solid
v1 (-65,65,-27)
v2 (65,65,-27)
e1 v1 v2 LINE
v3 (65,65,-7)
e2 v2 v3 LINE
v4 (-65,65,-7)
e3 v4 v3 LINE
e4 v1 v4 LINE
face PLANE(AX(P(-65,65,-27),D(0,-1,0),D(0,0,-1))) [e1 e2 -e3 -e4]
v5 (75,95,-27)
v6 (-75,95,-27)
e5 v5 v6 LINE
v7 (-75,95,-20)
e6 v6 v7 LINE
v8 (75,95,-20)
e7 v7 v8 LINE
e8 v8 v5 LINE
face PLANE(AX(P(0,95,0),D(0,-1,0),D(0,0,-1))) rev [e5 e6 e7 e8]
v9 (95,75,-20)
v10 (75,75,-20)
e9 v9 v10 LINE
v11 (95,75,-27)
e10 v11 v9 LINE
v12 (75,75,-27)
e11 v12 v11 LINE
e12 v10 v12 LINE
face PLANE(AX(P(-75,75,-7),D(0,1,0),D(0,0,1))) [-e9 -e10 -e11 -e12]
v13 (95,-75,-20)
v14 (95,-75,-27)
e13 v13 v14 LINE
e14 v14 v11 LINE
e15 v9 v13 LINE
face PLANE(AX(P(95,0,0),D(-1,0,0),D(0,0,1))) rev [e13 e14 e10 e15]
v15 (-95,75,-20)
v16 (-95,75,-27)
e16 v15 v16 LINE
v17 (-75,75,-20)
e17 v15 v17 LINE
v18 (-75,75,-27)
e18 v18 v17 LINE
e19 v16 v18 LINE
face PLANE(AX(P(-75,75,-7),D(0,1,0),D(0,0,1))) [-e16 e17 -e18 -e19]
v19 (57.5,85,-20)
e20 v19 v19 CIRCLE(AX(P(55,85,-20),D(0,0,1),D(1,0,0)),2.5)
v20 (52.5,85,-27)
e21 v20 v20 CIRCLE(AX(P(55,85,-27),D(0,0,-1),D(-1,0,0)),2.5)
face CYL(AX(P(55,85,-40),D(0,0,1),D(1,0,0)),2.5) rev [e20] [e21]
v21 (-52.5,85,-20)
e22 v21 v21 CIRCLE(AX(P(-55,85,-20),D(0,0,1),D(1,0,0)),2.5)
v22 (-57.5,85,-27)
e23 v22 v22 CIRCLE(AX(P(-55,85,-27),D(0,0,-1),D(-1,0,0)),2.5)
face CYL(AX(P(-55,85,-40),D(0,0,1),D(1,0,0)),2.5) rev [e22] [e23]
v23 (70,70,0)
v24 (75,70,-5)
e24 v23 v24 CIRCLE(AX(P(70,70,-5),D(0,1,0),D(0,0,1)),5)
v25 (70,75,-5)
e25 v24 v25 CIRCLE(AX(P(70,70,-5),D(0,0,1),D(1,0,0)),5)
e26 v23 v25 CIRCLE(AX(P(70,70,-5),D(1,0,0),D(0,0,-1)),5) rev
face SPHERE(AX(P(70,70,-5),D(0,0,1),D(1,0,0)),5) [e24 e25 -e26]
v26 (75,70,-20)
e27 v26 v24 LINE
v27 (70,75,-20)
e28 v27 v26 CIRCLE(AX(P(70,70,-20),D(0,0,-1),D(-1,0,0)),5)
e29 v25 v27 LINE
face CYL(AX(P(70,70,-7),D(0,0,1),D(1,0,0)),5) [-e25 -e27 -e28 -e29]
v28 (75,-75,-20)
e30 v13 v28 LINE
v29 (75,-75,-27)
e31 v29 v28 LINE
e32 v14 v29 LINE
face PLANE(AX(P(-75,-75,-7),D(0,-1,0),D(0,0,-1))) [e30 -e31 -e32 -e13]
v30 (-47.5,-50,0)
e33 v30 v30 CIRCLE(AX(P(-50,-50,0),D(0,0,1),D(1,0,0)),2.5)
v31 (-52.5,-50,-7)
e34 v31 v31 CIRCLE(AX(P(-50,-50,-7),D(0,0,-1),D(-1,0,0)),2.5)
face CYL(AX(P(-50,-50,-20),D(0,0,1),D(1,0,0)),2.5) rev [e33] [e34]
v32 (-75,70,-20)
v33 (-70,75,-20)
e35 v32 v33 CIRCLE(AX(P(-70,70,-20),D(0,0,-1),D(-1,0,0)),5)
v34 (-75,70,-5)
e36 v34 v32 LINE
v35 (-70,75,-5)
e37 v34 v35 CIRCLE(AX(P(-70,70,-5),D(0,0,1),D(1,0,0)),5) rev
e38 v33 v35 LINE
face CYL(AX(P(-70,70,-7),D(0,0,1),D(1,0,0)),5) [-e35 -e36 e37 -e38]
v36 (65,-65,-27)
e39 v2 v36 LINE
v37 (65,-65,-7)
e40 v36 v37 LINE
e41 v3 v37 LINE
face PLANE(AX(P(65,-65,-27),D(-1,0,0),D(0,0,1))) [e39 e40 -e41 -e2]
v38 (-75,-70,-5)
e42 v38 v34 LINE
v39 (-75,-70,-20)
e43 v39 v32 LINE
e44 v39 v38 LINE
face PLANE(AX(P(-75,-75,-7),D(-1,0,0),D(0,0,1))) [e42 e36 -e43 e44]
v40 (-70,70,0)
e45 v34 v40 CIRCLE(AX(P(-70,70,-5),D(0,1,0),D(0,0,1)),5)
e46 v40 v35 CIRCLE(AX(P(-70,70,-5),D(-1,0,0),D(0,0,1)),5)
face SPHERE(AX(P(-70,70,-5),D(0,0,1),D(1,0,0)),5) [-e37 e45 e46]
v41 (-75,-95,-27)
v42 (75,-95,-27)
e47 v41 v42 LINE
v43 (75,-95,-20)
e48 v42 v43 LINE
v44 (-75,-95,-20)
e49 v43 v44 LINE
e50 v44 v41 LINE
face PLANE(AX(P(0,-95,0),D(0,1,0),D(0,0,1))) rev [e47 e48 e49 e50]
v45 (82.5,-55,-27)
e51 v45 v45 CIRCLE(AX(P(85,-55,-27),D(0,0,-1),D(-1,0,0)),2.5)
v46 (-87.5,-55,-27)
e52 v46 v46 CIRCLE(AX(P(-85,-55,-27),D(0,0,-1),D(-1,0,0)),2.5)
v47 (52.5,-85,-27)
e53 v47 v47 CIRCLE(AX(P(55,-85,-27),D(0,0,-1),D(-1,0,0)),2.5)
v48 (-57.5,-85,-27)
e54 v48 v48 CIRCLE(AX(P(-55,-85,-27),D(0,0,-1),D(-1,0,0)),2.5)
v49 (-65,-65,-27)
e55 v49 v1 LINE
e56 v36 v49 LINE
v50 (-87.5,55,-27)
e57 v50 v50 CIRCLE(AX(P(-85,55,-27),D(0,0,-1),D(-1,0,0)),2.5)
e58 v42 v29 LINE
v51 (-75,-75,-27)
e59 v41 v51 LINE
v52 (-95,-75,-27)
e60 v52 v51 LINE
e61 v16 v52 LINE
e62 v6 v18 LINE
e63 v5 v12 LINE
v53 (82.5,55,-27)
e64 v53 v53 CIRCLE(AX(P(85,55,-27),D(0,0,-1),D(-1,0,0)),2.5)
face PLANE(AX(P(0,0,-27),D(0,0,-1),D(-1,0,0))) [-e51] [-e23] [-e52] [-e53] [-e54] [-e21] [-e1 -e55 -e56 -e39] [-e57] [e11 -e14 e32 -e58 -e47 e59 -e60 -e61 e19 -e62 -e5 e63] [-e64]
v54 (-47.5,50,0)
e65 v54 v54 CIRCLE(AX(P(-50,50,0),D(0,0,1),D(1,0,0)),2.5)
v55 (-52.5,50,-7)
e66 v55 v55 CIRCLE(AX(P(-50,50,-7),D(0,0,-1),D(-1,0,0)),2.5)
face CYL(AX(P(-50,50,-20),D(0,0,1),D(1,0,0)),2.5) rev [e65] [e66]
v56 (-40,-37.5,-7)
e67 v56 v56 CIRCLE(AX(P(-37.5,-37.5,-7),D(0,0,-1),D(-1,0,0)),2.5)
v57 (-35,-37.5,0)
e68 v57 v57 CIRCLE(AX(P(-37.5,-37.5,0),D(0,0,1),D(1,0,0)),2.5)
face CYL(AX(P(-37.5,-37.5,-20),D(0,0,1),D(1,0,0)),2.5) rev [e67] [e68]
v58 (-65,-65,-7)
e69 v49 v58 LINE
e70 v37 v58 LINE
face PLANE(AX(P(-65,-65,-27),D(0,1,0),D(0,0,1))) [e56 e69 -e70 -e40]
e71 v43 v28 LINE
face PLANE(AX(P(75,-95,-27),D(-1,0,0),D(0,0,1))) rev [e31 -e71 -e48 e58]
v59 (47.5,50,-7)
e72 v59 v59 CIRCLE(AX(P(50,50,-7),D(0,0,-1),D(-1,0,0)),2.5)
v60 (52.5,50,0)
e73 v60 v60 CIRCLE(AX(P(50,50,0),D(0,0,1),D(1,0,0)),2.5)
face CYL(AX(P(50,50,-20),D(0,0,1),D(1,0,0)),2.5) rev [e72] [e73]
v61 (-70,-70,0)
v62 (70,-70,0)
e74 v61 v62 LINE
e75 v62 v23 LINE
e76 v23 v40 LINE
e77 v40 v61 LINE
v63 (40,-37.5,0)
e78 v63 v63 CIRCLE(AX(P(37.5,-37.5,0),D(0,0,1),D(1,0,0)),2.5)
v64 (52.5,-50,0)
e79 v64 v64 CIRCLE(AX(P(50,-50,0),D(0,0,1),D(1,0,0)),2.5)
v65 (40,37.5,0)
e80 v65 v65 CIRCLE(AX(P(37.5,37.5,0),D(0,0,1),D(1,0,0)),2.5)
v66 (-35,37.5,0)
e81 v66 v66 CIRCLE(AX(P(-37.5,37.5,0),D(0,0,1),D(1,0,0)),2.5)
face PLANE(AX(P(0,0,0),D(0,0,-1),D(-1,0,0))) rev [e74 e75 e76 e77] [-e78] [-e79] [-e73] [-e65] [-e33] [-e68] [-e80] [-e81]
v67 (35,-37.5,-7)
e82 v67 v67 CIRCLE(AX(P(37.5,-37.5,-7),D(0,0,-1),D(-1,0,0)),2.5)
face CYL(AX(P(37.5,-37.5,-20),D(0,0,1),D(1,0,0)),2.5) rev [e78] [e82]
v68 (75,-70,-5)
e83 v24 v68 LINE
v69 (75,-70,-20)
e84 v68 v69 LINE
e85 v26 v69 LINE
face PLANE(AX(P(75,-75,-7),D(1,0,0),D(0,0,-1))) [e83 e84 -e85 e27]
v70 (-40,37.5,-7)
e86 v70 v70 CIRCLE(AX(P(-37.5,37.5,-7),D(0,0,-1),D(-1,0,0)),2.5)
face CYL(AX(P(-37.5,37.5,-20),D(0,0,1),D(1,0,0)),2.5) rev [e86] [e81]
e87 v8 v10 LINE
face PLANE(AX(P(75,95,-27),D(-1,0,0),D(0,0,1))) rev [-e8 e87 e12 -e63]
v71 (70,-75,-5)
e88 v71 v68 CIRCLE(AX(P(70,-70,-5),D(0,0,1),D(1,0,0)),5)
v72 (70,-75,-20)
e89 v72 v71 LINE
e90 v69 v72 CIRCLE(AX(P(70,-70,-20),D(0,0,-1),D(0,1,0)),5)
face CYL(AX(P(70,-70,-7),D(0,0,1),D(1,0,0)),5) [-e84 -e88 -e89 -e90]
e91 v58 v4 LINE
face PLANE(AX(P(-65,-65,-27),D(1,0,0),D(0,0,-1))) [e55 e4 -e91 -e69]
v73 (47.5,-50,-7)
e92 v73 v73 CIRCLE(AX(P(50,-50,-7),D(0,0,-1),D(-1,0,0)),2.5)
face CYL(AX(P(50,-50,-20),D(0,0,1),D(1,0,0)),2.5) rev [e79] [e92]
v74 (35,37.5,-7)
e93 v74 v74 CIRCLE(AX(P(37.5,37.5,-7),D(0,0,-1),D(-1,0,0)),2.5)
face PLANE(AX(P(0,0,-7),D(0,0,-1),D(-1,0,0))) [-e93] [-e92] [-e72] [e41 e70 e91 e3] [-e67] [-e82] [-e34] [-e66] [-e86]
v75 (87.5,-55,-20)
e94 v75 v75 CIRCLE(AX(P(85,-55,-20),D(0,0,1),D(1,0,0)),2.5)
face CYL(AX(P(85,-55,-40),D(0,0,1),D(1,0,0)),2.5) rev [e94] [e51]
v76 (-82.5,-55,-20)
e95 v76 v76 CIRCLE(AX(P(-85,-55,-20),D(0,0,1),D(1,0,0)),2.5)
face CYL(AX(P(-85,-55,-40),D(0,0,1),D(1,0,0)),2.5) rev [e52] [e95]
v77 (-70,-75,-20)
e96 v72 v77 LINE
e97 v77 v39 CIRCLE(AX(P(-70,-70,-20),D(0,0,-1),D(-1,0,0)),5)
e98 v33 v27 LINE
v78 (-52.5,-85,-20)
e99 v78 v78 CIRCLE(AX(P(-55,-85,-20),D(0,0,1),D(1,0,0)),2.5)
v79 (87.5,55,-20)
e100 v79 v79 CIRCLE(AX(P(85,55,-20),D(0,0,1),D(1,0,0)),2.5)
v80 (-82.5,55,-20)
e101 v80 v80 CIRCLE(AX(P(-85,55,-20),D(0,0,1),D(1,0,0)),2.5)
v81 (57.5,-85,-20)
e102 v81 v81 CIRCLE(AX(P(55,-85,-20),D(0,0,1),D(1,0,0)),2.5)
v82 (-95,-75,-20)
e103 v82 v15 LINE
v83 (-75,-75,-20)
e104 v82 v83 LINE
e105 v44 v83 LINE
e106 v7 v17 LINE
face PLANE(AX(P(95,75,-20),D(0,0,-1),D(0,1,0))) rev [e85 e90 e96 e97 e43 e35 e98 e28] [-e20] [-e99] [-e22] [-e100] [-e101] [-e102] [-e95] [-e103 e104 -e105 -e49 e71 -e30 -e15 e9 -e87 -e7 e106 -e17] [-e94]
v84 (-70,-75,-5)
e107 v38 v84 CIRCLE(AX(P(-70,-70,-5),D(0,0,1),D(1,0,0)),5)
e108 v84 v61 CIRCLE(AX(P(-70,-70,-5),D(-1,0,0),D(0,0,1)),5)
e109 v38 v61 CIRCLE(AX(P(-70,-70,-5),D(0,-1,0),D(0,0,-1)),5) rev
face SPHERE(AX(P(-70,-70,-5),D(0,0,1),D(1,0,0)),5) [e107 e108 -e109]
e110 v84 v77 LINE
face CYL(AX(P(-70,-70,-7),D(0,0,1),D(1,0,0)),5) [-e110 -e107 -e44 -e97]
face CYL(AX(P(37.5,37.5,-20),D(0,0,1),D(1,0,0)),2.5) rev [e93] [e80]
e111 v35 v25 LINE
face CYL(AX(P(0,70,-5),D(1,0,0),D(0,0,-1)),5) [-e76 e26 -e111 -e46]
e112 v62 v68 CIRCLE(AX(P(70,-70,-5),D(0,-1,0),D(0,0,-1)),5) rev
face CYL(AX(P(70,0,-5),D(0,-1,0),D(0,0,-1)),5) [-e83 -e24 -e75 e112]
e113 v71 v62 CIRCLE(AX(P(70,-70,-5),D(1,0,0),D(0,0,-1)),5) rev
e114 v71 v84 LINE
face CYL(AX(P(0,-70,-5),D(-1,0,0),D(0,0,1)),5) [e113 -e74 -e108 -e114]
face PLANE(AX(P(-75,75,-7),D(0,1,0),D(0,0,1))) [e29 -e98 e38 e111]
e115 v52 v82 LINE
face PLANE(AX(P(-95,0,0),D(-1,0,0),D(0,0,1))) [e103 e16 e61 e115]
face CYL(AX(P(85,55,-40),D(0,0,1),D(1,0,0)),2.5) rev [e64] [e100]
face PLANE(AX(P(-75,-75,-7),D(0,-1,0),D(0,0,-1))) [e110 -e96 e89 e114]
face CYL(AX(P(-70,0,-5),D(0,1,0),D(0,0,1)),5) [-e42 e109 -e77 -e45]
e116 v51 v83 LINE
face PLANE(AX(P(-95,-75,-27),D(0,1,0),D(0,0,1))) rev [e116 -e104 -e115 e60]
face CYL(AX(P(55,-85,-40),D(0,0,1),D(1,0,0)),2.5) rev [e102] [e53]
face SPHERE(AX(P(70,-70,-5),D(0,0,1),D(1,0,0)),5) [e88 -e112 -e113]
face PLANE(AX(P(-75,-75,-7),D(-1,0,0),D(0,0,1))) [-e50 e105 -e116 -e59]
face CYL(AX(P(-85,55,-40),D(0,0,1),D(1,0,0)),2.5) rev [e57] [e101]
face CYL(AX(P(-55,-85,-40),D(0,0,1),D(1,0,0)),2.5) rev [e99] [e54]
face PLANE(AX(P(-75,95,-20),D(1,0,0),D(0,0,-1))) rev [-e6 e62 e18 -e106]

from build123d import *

# Parameters (mm, degrees)
SKETCH1_W           = 150
SKETCH1_H           = 150
BASE_FLANGE1_DEPTH  = 7
SKETCH23_W          = 150
SKETCH23_H          = 150
SKETCH23_W_2        = 130
SKETCH23_H_2        = 130
BOSS_EXTRUDE3_DEPTH = 20
SKETCH27_W          = 7
SKETCH27_H          = 150
BOSS_EXTRUDE4_DEPTH = 20
SKETCH28_W          = 150
SKETCH28_H          = 7
BOSS_EXTRUDE5_DEPTH = 20
SKETCH29_W          = 7
SKETCH29_H          = 150
BOSS_EXTRUDE6_DEPTH = 20
SKETCH30_W          = 150
SKETCH30_H          = 7
BOSS_EXTRUDE7_DEPTH = 20
SKETCH31_R          = 2.5
CUT_EXTRUDE1_DEPTH  = 20
SKETCH32_R          = 2.5
CUT_EXTRUDE2_DEPTH  = 20
FILLET1_R           = 5


# Sheet-metal steps are written as plain solids
with BuildPart() as part:
    # Sketch1 → Base-Flange1 (new body)
    with BuildSketch(Plane.XY):
        Rectangle(SKETCH1_W, SKETCH1_H)
    extrude(amount=-BASE_FLANGE1_DEPTH)

    # Sketch23 → Boss-Extrude3 (add)
    with BuildSketch(Plane(origin=(0, 0, -7), x_dir=(-1, 0, 0), z_dir=(0, 0, -1))):
        Rectangle(SKETCH23_W, SKETCH23_H)
        Rectangle(SKETCH23_W_2, SKETCH23_H_2, mode=Mode.SUBTRACT)
    extrude(amount=BOSS_EXTRUDE3_DEPTH)

    # Sketch27 → Boss-Extrude4 (add)
    with BuildSketch(Plane(origin=(75, 0, 0), x_dir=(0, 0, -1), z_dir=(1, 0, 0))):
        with Locations((23.5, 0)):
            Rectangle(SKETCH27_W, SKETCH27_H)
    extrude(amount=BOSS_EXTRUDE4_DEPTH)

    # Sketch28 → Boss-Extrude5 (add)
    with BuildSketch(Plane(origin=(0, -75, 0), x_dir=(-1, 0, 0), z_dir=(0, -1, 0))):
        with Locations((0, 23.5)):
            Rectangle(SKETCH28_W, SKETCH28_H)
    extrude(amount=BOSS_EXTRUDE5_DEPTH)

    # Sketch29 → Boss-Extrude6 (add)
    with BuildSketch(Plane.ZY.offset(75)):
        with Locations((-23.5, 0)):
            Rectangle(SKETCH29_W, SKETCH29_H)
    extrude(amount=BOSS_EXTRUDE6_DEPTH)

    # Sketch30 → Boss-Extrude7 (add)
    with BuildSketch(Plane(origin=(0, 75, 0), x_dir=(1, 0, 0), z_dir=(0, 1, 0))):
        with Locations((0, 23.5)):
            Rectangle(SKETCH30_W, SKETCH30_H)
    extrude(amount=BOSS_EXTRUDE7_DEPTH)

    # Sketch31 → Cut-Extrude1 (cut)
    with BuildSketch(Plane.XY):
        with Locations((-50, -50)):
            Circle(SKETCH31_R)
        with Locations((-50, 50)):
            Circle(SKETCH31_R)
        with Locations((50, 50)):
            Circle(SKETCH31_R)
        with Locations((50, -50)):
            Circle(SKETCH31_R)
        with Locations((37.5, 37.5)):
            Circle(SKETCH31_R)
        with Locations((-37.5, 37.5)):
            Circle(SKETCH31_R)
        with Locations((37.5, -37.5)):
            Circle(SKETCH31_R)
        with Locations((-37.5, -37.5)):
            Circle(SKETCH31_R)
    extrude(amount=-CUT_EXTRUDE1_DEPTH, mode=Mode.SUBTRACT)

    # Sketch32 → Cut-Extrude2 (cut)
    with BuildSketch(Plane.XY.offset(-20)):
        with Locations((85, 55)):
            Circle(SKETCH32_R)
        with Locations((85, -55)):
            Circle(SKETCH32_R)
        with Locations((55, -85)):
            Circle(SKETCH32_R)
        with Locations((-55, -85)):
            Circle(SKETCH32_R)
        with Locations((-85, -55)):
            Circle(SKETCH32_R)
        with Locations((-85, 55)):
            Circle(SKETCH32_R)
        with Locations((-55, 85)):
            Circle(SKETCH32_R)
        with Locations((55, 85)):
            Circle(SKETCH32_R)
    extrude(amount=-CUT_EXTRUDE2_DEPTH, mode=Mode.SUBTRACT)

    # Fillet1
    # the kernel refuses this fillet: 5 mm, written as the material it takes off along each edge
    with BuildSketch(Plane(origin=(70, -70, -5), x_dir=(0, 0, 1), z_dir=(0, -1, 0))) as fillet1_piece_1_section:
        Polygon((0, 0), (FILLET1_R, 0), (FILLET1_R, -FILLET1_R), (0, -FILLET1_R), align=None)
    fillet1_piece_1 = extrude(amount=FILLET1_R, mode=Mode.PRIVATE)
    fillet1_piece_1 = fillet1_piece_1 - Plane(origin=(70, -70, -5), x_dir=(-0.7071067811865475, 0, -0.7071067811865475), z_dir=(0, -1, 0)) * Sphere(FILLET1_R, mode=Mode.PRIVATE)
    add(fillet1_piece_1, mode=Mode.SUBTRACT)
    with BuildSketch(Plane(origin=(70, 70, -5), x_dir=(1, 0, 0), z_dir=(0, 0, 1))) as fillet1_piece_2_section:
        Polygon((0, 0), (FILLET1_R, 0), (FILLET1_R, FILLET1_R), (0, FILLET1_R), align=None)
    fillet1_piece_2 = extrude(amount=FILLET1_R, mode=Mode.PRIVATE)
    fillet1_piece_2 = fillet1_piece_2 - Plane(origin=(70, 70, -5), x_dir=(-0.7071067811865475, -0.7071067811865475, 0), z_dir=(0, 0, 1)) * Sphere(FILLET1_R, mode=Mode.PRIVATE)
    add(fillet1_piece_2, mode=Mode.SUBTRACT)
    with BuildSketch(Plane(origin=(-70, -70, -5), x_dir=(0, 0, 1), z_dir=(0, -1, 0))) as fillet1_piece_3_section:
        Polygon((0, 0), (FILLET1_R, 0), (FILLET1_R, FILLET1_R), (0, FILLET1_R), align=None)
    fillet1_piece_3 = extrude(amount=FILLET1_R, mode=Mode.PRIVATE)
    fillet1_piece_3 = fillet1_piece_3 - Plane(origin=(-70, -70, -5), x_dir=(0.7071067811865475, 0, -0.7071067811865475), z_dir=(0, -1, 0)) * Sphere(FILLET1_R, mode=Mode.PRIVATE)
    add(fillet1_piece_3, mode=Mode.SUBTRACT)
    with BuildSketch(Plane(origin=(-70, 70, -5), x_dir=(-1, 0, 0), z_dir=(0, 0, 1))) as fillet1_piece_4_section:
        Polygon((0, 0), (FILLET1_R, 0), (FILLET1_R, -FILLET1_R), (0, -FILLET1_R), align=None)
    fillet1_piece_4 = extrude(amount=FILLET1_R, mode=Mode.PRIVATE)
    fillet1_piece_4 = fillet1_piece_4 - Plane(origin=(-70, 70, -5), x_dir=(0.7071067811865475, -0.7071067811865475, 0), z_dir=(0, 0, 1)) * Sphere(FILLET1_R, mode=Mode.PRIVATE)
    add(fillet1_piece_4, mode=Mode.SUBTRACT)
    with BuildSketch(Plane(origin=(75, -75, -20), x_dir=(-1, 0, 0), z_dir=(0, 0, 1)), Plane(origin=(75, 75, -20), x_dir=(0, -1, 0), z_dir=(0, 0, 1)), Plane(origin=(-75, -75, -5), x_dir=(1, 0, 0), z_dir=(0, 0, -1)), Plane(origin=(-75, 75, -5), x_dir=(0, -1, 0), z_dir=(0, 0, -1))) as fillet1_piece_5:
        with BuildLine():
            CenterArc((FILLET1_R, -FILLET1_R), FILLET1_R, 90, 90)
            Line((0, -FILLET1_R), (0, 0))
            Line((0, 0), (FILLET1_R, 0))
        make_face()
    extrude(amount=15, mode=Mode.SUBTRACT)
    with BuildSketch(Plane(origin=(-70, -75, 0), x_dir=(0, 0, -1), z_dir=(1, 0, 0))) as fillet1_piece_6:
        with BuildLine():
            CenterArc((FILLET1_R, FILLET1_R), FILLET1_R, 180, 90)
            Line((0, FILLET1_R), (0, 0))
            Line((0, 0), (FILLET1_R, 0))
        make_face()
    extrude(amount=140, mode=Mode.SUBTRACT)
    with BuildSketch(Plane(origin=(-75, 70, 0), x_dir=(1, 0, 0), z_dir=(0, -1, 0)), Plane(origin=(70, 75, 0), x_dir=(0, -1, 0), z_dir=(-1, 0, 0)), Plane(origin=(75, -70, 0), x_dir=(-1, 0, 0), z_dir=(0, 1, 0))) as fillet1_piece_7:
        with BuildLine():
            CenterArc((FILLET1_R, -FILLET1_R), FILLET1_R, 90, 90)
            Line((0, -FILLET1_R), (0, 0))
            Line((0, 0), (FILLET1_R, 0))
        make_face()
    extrude(amount=140, mode=Mode.SUBTRACT)


solid = part.part
